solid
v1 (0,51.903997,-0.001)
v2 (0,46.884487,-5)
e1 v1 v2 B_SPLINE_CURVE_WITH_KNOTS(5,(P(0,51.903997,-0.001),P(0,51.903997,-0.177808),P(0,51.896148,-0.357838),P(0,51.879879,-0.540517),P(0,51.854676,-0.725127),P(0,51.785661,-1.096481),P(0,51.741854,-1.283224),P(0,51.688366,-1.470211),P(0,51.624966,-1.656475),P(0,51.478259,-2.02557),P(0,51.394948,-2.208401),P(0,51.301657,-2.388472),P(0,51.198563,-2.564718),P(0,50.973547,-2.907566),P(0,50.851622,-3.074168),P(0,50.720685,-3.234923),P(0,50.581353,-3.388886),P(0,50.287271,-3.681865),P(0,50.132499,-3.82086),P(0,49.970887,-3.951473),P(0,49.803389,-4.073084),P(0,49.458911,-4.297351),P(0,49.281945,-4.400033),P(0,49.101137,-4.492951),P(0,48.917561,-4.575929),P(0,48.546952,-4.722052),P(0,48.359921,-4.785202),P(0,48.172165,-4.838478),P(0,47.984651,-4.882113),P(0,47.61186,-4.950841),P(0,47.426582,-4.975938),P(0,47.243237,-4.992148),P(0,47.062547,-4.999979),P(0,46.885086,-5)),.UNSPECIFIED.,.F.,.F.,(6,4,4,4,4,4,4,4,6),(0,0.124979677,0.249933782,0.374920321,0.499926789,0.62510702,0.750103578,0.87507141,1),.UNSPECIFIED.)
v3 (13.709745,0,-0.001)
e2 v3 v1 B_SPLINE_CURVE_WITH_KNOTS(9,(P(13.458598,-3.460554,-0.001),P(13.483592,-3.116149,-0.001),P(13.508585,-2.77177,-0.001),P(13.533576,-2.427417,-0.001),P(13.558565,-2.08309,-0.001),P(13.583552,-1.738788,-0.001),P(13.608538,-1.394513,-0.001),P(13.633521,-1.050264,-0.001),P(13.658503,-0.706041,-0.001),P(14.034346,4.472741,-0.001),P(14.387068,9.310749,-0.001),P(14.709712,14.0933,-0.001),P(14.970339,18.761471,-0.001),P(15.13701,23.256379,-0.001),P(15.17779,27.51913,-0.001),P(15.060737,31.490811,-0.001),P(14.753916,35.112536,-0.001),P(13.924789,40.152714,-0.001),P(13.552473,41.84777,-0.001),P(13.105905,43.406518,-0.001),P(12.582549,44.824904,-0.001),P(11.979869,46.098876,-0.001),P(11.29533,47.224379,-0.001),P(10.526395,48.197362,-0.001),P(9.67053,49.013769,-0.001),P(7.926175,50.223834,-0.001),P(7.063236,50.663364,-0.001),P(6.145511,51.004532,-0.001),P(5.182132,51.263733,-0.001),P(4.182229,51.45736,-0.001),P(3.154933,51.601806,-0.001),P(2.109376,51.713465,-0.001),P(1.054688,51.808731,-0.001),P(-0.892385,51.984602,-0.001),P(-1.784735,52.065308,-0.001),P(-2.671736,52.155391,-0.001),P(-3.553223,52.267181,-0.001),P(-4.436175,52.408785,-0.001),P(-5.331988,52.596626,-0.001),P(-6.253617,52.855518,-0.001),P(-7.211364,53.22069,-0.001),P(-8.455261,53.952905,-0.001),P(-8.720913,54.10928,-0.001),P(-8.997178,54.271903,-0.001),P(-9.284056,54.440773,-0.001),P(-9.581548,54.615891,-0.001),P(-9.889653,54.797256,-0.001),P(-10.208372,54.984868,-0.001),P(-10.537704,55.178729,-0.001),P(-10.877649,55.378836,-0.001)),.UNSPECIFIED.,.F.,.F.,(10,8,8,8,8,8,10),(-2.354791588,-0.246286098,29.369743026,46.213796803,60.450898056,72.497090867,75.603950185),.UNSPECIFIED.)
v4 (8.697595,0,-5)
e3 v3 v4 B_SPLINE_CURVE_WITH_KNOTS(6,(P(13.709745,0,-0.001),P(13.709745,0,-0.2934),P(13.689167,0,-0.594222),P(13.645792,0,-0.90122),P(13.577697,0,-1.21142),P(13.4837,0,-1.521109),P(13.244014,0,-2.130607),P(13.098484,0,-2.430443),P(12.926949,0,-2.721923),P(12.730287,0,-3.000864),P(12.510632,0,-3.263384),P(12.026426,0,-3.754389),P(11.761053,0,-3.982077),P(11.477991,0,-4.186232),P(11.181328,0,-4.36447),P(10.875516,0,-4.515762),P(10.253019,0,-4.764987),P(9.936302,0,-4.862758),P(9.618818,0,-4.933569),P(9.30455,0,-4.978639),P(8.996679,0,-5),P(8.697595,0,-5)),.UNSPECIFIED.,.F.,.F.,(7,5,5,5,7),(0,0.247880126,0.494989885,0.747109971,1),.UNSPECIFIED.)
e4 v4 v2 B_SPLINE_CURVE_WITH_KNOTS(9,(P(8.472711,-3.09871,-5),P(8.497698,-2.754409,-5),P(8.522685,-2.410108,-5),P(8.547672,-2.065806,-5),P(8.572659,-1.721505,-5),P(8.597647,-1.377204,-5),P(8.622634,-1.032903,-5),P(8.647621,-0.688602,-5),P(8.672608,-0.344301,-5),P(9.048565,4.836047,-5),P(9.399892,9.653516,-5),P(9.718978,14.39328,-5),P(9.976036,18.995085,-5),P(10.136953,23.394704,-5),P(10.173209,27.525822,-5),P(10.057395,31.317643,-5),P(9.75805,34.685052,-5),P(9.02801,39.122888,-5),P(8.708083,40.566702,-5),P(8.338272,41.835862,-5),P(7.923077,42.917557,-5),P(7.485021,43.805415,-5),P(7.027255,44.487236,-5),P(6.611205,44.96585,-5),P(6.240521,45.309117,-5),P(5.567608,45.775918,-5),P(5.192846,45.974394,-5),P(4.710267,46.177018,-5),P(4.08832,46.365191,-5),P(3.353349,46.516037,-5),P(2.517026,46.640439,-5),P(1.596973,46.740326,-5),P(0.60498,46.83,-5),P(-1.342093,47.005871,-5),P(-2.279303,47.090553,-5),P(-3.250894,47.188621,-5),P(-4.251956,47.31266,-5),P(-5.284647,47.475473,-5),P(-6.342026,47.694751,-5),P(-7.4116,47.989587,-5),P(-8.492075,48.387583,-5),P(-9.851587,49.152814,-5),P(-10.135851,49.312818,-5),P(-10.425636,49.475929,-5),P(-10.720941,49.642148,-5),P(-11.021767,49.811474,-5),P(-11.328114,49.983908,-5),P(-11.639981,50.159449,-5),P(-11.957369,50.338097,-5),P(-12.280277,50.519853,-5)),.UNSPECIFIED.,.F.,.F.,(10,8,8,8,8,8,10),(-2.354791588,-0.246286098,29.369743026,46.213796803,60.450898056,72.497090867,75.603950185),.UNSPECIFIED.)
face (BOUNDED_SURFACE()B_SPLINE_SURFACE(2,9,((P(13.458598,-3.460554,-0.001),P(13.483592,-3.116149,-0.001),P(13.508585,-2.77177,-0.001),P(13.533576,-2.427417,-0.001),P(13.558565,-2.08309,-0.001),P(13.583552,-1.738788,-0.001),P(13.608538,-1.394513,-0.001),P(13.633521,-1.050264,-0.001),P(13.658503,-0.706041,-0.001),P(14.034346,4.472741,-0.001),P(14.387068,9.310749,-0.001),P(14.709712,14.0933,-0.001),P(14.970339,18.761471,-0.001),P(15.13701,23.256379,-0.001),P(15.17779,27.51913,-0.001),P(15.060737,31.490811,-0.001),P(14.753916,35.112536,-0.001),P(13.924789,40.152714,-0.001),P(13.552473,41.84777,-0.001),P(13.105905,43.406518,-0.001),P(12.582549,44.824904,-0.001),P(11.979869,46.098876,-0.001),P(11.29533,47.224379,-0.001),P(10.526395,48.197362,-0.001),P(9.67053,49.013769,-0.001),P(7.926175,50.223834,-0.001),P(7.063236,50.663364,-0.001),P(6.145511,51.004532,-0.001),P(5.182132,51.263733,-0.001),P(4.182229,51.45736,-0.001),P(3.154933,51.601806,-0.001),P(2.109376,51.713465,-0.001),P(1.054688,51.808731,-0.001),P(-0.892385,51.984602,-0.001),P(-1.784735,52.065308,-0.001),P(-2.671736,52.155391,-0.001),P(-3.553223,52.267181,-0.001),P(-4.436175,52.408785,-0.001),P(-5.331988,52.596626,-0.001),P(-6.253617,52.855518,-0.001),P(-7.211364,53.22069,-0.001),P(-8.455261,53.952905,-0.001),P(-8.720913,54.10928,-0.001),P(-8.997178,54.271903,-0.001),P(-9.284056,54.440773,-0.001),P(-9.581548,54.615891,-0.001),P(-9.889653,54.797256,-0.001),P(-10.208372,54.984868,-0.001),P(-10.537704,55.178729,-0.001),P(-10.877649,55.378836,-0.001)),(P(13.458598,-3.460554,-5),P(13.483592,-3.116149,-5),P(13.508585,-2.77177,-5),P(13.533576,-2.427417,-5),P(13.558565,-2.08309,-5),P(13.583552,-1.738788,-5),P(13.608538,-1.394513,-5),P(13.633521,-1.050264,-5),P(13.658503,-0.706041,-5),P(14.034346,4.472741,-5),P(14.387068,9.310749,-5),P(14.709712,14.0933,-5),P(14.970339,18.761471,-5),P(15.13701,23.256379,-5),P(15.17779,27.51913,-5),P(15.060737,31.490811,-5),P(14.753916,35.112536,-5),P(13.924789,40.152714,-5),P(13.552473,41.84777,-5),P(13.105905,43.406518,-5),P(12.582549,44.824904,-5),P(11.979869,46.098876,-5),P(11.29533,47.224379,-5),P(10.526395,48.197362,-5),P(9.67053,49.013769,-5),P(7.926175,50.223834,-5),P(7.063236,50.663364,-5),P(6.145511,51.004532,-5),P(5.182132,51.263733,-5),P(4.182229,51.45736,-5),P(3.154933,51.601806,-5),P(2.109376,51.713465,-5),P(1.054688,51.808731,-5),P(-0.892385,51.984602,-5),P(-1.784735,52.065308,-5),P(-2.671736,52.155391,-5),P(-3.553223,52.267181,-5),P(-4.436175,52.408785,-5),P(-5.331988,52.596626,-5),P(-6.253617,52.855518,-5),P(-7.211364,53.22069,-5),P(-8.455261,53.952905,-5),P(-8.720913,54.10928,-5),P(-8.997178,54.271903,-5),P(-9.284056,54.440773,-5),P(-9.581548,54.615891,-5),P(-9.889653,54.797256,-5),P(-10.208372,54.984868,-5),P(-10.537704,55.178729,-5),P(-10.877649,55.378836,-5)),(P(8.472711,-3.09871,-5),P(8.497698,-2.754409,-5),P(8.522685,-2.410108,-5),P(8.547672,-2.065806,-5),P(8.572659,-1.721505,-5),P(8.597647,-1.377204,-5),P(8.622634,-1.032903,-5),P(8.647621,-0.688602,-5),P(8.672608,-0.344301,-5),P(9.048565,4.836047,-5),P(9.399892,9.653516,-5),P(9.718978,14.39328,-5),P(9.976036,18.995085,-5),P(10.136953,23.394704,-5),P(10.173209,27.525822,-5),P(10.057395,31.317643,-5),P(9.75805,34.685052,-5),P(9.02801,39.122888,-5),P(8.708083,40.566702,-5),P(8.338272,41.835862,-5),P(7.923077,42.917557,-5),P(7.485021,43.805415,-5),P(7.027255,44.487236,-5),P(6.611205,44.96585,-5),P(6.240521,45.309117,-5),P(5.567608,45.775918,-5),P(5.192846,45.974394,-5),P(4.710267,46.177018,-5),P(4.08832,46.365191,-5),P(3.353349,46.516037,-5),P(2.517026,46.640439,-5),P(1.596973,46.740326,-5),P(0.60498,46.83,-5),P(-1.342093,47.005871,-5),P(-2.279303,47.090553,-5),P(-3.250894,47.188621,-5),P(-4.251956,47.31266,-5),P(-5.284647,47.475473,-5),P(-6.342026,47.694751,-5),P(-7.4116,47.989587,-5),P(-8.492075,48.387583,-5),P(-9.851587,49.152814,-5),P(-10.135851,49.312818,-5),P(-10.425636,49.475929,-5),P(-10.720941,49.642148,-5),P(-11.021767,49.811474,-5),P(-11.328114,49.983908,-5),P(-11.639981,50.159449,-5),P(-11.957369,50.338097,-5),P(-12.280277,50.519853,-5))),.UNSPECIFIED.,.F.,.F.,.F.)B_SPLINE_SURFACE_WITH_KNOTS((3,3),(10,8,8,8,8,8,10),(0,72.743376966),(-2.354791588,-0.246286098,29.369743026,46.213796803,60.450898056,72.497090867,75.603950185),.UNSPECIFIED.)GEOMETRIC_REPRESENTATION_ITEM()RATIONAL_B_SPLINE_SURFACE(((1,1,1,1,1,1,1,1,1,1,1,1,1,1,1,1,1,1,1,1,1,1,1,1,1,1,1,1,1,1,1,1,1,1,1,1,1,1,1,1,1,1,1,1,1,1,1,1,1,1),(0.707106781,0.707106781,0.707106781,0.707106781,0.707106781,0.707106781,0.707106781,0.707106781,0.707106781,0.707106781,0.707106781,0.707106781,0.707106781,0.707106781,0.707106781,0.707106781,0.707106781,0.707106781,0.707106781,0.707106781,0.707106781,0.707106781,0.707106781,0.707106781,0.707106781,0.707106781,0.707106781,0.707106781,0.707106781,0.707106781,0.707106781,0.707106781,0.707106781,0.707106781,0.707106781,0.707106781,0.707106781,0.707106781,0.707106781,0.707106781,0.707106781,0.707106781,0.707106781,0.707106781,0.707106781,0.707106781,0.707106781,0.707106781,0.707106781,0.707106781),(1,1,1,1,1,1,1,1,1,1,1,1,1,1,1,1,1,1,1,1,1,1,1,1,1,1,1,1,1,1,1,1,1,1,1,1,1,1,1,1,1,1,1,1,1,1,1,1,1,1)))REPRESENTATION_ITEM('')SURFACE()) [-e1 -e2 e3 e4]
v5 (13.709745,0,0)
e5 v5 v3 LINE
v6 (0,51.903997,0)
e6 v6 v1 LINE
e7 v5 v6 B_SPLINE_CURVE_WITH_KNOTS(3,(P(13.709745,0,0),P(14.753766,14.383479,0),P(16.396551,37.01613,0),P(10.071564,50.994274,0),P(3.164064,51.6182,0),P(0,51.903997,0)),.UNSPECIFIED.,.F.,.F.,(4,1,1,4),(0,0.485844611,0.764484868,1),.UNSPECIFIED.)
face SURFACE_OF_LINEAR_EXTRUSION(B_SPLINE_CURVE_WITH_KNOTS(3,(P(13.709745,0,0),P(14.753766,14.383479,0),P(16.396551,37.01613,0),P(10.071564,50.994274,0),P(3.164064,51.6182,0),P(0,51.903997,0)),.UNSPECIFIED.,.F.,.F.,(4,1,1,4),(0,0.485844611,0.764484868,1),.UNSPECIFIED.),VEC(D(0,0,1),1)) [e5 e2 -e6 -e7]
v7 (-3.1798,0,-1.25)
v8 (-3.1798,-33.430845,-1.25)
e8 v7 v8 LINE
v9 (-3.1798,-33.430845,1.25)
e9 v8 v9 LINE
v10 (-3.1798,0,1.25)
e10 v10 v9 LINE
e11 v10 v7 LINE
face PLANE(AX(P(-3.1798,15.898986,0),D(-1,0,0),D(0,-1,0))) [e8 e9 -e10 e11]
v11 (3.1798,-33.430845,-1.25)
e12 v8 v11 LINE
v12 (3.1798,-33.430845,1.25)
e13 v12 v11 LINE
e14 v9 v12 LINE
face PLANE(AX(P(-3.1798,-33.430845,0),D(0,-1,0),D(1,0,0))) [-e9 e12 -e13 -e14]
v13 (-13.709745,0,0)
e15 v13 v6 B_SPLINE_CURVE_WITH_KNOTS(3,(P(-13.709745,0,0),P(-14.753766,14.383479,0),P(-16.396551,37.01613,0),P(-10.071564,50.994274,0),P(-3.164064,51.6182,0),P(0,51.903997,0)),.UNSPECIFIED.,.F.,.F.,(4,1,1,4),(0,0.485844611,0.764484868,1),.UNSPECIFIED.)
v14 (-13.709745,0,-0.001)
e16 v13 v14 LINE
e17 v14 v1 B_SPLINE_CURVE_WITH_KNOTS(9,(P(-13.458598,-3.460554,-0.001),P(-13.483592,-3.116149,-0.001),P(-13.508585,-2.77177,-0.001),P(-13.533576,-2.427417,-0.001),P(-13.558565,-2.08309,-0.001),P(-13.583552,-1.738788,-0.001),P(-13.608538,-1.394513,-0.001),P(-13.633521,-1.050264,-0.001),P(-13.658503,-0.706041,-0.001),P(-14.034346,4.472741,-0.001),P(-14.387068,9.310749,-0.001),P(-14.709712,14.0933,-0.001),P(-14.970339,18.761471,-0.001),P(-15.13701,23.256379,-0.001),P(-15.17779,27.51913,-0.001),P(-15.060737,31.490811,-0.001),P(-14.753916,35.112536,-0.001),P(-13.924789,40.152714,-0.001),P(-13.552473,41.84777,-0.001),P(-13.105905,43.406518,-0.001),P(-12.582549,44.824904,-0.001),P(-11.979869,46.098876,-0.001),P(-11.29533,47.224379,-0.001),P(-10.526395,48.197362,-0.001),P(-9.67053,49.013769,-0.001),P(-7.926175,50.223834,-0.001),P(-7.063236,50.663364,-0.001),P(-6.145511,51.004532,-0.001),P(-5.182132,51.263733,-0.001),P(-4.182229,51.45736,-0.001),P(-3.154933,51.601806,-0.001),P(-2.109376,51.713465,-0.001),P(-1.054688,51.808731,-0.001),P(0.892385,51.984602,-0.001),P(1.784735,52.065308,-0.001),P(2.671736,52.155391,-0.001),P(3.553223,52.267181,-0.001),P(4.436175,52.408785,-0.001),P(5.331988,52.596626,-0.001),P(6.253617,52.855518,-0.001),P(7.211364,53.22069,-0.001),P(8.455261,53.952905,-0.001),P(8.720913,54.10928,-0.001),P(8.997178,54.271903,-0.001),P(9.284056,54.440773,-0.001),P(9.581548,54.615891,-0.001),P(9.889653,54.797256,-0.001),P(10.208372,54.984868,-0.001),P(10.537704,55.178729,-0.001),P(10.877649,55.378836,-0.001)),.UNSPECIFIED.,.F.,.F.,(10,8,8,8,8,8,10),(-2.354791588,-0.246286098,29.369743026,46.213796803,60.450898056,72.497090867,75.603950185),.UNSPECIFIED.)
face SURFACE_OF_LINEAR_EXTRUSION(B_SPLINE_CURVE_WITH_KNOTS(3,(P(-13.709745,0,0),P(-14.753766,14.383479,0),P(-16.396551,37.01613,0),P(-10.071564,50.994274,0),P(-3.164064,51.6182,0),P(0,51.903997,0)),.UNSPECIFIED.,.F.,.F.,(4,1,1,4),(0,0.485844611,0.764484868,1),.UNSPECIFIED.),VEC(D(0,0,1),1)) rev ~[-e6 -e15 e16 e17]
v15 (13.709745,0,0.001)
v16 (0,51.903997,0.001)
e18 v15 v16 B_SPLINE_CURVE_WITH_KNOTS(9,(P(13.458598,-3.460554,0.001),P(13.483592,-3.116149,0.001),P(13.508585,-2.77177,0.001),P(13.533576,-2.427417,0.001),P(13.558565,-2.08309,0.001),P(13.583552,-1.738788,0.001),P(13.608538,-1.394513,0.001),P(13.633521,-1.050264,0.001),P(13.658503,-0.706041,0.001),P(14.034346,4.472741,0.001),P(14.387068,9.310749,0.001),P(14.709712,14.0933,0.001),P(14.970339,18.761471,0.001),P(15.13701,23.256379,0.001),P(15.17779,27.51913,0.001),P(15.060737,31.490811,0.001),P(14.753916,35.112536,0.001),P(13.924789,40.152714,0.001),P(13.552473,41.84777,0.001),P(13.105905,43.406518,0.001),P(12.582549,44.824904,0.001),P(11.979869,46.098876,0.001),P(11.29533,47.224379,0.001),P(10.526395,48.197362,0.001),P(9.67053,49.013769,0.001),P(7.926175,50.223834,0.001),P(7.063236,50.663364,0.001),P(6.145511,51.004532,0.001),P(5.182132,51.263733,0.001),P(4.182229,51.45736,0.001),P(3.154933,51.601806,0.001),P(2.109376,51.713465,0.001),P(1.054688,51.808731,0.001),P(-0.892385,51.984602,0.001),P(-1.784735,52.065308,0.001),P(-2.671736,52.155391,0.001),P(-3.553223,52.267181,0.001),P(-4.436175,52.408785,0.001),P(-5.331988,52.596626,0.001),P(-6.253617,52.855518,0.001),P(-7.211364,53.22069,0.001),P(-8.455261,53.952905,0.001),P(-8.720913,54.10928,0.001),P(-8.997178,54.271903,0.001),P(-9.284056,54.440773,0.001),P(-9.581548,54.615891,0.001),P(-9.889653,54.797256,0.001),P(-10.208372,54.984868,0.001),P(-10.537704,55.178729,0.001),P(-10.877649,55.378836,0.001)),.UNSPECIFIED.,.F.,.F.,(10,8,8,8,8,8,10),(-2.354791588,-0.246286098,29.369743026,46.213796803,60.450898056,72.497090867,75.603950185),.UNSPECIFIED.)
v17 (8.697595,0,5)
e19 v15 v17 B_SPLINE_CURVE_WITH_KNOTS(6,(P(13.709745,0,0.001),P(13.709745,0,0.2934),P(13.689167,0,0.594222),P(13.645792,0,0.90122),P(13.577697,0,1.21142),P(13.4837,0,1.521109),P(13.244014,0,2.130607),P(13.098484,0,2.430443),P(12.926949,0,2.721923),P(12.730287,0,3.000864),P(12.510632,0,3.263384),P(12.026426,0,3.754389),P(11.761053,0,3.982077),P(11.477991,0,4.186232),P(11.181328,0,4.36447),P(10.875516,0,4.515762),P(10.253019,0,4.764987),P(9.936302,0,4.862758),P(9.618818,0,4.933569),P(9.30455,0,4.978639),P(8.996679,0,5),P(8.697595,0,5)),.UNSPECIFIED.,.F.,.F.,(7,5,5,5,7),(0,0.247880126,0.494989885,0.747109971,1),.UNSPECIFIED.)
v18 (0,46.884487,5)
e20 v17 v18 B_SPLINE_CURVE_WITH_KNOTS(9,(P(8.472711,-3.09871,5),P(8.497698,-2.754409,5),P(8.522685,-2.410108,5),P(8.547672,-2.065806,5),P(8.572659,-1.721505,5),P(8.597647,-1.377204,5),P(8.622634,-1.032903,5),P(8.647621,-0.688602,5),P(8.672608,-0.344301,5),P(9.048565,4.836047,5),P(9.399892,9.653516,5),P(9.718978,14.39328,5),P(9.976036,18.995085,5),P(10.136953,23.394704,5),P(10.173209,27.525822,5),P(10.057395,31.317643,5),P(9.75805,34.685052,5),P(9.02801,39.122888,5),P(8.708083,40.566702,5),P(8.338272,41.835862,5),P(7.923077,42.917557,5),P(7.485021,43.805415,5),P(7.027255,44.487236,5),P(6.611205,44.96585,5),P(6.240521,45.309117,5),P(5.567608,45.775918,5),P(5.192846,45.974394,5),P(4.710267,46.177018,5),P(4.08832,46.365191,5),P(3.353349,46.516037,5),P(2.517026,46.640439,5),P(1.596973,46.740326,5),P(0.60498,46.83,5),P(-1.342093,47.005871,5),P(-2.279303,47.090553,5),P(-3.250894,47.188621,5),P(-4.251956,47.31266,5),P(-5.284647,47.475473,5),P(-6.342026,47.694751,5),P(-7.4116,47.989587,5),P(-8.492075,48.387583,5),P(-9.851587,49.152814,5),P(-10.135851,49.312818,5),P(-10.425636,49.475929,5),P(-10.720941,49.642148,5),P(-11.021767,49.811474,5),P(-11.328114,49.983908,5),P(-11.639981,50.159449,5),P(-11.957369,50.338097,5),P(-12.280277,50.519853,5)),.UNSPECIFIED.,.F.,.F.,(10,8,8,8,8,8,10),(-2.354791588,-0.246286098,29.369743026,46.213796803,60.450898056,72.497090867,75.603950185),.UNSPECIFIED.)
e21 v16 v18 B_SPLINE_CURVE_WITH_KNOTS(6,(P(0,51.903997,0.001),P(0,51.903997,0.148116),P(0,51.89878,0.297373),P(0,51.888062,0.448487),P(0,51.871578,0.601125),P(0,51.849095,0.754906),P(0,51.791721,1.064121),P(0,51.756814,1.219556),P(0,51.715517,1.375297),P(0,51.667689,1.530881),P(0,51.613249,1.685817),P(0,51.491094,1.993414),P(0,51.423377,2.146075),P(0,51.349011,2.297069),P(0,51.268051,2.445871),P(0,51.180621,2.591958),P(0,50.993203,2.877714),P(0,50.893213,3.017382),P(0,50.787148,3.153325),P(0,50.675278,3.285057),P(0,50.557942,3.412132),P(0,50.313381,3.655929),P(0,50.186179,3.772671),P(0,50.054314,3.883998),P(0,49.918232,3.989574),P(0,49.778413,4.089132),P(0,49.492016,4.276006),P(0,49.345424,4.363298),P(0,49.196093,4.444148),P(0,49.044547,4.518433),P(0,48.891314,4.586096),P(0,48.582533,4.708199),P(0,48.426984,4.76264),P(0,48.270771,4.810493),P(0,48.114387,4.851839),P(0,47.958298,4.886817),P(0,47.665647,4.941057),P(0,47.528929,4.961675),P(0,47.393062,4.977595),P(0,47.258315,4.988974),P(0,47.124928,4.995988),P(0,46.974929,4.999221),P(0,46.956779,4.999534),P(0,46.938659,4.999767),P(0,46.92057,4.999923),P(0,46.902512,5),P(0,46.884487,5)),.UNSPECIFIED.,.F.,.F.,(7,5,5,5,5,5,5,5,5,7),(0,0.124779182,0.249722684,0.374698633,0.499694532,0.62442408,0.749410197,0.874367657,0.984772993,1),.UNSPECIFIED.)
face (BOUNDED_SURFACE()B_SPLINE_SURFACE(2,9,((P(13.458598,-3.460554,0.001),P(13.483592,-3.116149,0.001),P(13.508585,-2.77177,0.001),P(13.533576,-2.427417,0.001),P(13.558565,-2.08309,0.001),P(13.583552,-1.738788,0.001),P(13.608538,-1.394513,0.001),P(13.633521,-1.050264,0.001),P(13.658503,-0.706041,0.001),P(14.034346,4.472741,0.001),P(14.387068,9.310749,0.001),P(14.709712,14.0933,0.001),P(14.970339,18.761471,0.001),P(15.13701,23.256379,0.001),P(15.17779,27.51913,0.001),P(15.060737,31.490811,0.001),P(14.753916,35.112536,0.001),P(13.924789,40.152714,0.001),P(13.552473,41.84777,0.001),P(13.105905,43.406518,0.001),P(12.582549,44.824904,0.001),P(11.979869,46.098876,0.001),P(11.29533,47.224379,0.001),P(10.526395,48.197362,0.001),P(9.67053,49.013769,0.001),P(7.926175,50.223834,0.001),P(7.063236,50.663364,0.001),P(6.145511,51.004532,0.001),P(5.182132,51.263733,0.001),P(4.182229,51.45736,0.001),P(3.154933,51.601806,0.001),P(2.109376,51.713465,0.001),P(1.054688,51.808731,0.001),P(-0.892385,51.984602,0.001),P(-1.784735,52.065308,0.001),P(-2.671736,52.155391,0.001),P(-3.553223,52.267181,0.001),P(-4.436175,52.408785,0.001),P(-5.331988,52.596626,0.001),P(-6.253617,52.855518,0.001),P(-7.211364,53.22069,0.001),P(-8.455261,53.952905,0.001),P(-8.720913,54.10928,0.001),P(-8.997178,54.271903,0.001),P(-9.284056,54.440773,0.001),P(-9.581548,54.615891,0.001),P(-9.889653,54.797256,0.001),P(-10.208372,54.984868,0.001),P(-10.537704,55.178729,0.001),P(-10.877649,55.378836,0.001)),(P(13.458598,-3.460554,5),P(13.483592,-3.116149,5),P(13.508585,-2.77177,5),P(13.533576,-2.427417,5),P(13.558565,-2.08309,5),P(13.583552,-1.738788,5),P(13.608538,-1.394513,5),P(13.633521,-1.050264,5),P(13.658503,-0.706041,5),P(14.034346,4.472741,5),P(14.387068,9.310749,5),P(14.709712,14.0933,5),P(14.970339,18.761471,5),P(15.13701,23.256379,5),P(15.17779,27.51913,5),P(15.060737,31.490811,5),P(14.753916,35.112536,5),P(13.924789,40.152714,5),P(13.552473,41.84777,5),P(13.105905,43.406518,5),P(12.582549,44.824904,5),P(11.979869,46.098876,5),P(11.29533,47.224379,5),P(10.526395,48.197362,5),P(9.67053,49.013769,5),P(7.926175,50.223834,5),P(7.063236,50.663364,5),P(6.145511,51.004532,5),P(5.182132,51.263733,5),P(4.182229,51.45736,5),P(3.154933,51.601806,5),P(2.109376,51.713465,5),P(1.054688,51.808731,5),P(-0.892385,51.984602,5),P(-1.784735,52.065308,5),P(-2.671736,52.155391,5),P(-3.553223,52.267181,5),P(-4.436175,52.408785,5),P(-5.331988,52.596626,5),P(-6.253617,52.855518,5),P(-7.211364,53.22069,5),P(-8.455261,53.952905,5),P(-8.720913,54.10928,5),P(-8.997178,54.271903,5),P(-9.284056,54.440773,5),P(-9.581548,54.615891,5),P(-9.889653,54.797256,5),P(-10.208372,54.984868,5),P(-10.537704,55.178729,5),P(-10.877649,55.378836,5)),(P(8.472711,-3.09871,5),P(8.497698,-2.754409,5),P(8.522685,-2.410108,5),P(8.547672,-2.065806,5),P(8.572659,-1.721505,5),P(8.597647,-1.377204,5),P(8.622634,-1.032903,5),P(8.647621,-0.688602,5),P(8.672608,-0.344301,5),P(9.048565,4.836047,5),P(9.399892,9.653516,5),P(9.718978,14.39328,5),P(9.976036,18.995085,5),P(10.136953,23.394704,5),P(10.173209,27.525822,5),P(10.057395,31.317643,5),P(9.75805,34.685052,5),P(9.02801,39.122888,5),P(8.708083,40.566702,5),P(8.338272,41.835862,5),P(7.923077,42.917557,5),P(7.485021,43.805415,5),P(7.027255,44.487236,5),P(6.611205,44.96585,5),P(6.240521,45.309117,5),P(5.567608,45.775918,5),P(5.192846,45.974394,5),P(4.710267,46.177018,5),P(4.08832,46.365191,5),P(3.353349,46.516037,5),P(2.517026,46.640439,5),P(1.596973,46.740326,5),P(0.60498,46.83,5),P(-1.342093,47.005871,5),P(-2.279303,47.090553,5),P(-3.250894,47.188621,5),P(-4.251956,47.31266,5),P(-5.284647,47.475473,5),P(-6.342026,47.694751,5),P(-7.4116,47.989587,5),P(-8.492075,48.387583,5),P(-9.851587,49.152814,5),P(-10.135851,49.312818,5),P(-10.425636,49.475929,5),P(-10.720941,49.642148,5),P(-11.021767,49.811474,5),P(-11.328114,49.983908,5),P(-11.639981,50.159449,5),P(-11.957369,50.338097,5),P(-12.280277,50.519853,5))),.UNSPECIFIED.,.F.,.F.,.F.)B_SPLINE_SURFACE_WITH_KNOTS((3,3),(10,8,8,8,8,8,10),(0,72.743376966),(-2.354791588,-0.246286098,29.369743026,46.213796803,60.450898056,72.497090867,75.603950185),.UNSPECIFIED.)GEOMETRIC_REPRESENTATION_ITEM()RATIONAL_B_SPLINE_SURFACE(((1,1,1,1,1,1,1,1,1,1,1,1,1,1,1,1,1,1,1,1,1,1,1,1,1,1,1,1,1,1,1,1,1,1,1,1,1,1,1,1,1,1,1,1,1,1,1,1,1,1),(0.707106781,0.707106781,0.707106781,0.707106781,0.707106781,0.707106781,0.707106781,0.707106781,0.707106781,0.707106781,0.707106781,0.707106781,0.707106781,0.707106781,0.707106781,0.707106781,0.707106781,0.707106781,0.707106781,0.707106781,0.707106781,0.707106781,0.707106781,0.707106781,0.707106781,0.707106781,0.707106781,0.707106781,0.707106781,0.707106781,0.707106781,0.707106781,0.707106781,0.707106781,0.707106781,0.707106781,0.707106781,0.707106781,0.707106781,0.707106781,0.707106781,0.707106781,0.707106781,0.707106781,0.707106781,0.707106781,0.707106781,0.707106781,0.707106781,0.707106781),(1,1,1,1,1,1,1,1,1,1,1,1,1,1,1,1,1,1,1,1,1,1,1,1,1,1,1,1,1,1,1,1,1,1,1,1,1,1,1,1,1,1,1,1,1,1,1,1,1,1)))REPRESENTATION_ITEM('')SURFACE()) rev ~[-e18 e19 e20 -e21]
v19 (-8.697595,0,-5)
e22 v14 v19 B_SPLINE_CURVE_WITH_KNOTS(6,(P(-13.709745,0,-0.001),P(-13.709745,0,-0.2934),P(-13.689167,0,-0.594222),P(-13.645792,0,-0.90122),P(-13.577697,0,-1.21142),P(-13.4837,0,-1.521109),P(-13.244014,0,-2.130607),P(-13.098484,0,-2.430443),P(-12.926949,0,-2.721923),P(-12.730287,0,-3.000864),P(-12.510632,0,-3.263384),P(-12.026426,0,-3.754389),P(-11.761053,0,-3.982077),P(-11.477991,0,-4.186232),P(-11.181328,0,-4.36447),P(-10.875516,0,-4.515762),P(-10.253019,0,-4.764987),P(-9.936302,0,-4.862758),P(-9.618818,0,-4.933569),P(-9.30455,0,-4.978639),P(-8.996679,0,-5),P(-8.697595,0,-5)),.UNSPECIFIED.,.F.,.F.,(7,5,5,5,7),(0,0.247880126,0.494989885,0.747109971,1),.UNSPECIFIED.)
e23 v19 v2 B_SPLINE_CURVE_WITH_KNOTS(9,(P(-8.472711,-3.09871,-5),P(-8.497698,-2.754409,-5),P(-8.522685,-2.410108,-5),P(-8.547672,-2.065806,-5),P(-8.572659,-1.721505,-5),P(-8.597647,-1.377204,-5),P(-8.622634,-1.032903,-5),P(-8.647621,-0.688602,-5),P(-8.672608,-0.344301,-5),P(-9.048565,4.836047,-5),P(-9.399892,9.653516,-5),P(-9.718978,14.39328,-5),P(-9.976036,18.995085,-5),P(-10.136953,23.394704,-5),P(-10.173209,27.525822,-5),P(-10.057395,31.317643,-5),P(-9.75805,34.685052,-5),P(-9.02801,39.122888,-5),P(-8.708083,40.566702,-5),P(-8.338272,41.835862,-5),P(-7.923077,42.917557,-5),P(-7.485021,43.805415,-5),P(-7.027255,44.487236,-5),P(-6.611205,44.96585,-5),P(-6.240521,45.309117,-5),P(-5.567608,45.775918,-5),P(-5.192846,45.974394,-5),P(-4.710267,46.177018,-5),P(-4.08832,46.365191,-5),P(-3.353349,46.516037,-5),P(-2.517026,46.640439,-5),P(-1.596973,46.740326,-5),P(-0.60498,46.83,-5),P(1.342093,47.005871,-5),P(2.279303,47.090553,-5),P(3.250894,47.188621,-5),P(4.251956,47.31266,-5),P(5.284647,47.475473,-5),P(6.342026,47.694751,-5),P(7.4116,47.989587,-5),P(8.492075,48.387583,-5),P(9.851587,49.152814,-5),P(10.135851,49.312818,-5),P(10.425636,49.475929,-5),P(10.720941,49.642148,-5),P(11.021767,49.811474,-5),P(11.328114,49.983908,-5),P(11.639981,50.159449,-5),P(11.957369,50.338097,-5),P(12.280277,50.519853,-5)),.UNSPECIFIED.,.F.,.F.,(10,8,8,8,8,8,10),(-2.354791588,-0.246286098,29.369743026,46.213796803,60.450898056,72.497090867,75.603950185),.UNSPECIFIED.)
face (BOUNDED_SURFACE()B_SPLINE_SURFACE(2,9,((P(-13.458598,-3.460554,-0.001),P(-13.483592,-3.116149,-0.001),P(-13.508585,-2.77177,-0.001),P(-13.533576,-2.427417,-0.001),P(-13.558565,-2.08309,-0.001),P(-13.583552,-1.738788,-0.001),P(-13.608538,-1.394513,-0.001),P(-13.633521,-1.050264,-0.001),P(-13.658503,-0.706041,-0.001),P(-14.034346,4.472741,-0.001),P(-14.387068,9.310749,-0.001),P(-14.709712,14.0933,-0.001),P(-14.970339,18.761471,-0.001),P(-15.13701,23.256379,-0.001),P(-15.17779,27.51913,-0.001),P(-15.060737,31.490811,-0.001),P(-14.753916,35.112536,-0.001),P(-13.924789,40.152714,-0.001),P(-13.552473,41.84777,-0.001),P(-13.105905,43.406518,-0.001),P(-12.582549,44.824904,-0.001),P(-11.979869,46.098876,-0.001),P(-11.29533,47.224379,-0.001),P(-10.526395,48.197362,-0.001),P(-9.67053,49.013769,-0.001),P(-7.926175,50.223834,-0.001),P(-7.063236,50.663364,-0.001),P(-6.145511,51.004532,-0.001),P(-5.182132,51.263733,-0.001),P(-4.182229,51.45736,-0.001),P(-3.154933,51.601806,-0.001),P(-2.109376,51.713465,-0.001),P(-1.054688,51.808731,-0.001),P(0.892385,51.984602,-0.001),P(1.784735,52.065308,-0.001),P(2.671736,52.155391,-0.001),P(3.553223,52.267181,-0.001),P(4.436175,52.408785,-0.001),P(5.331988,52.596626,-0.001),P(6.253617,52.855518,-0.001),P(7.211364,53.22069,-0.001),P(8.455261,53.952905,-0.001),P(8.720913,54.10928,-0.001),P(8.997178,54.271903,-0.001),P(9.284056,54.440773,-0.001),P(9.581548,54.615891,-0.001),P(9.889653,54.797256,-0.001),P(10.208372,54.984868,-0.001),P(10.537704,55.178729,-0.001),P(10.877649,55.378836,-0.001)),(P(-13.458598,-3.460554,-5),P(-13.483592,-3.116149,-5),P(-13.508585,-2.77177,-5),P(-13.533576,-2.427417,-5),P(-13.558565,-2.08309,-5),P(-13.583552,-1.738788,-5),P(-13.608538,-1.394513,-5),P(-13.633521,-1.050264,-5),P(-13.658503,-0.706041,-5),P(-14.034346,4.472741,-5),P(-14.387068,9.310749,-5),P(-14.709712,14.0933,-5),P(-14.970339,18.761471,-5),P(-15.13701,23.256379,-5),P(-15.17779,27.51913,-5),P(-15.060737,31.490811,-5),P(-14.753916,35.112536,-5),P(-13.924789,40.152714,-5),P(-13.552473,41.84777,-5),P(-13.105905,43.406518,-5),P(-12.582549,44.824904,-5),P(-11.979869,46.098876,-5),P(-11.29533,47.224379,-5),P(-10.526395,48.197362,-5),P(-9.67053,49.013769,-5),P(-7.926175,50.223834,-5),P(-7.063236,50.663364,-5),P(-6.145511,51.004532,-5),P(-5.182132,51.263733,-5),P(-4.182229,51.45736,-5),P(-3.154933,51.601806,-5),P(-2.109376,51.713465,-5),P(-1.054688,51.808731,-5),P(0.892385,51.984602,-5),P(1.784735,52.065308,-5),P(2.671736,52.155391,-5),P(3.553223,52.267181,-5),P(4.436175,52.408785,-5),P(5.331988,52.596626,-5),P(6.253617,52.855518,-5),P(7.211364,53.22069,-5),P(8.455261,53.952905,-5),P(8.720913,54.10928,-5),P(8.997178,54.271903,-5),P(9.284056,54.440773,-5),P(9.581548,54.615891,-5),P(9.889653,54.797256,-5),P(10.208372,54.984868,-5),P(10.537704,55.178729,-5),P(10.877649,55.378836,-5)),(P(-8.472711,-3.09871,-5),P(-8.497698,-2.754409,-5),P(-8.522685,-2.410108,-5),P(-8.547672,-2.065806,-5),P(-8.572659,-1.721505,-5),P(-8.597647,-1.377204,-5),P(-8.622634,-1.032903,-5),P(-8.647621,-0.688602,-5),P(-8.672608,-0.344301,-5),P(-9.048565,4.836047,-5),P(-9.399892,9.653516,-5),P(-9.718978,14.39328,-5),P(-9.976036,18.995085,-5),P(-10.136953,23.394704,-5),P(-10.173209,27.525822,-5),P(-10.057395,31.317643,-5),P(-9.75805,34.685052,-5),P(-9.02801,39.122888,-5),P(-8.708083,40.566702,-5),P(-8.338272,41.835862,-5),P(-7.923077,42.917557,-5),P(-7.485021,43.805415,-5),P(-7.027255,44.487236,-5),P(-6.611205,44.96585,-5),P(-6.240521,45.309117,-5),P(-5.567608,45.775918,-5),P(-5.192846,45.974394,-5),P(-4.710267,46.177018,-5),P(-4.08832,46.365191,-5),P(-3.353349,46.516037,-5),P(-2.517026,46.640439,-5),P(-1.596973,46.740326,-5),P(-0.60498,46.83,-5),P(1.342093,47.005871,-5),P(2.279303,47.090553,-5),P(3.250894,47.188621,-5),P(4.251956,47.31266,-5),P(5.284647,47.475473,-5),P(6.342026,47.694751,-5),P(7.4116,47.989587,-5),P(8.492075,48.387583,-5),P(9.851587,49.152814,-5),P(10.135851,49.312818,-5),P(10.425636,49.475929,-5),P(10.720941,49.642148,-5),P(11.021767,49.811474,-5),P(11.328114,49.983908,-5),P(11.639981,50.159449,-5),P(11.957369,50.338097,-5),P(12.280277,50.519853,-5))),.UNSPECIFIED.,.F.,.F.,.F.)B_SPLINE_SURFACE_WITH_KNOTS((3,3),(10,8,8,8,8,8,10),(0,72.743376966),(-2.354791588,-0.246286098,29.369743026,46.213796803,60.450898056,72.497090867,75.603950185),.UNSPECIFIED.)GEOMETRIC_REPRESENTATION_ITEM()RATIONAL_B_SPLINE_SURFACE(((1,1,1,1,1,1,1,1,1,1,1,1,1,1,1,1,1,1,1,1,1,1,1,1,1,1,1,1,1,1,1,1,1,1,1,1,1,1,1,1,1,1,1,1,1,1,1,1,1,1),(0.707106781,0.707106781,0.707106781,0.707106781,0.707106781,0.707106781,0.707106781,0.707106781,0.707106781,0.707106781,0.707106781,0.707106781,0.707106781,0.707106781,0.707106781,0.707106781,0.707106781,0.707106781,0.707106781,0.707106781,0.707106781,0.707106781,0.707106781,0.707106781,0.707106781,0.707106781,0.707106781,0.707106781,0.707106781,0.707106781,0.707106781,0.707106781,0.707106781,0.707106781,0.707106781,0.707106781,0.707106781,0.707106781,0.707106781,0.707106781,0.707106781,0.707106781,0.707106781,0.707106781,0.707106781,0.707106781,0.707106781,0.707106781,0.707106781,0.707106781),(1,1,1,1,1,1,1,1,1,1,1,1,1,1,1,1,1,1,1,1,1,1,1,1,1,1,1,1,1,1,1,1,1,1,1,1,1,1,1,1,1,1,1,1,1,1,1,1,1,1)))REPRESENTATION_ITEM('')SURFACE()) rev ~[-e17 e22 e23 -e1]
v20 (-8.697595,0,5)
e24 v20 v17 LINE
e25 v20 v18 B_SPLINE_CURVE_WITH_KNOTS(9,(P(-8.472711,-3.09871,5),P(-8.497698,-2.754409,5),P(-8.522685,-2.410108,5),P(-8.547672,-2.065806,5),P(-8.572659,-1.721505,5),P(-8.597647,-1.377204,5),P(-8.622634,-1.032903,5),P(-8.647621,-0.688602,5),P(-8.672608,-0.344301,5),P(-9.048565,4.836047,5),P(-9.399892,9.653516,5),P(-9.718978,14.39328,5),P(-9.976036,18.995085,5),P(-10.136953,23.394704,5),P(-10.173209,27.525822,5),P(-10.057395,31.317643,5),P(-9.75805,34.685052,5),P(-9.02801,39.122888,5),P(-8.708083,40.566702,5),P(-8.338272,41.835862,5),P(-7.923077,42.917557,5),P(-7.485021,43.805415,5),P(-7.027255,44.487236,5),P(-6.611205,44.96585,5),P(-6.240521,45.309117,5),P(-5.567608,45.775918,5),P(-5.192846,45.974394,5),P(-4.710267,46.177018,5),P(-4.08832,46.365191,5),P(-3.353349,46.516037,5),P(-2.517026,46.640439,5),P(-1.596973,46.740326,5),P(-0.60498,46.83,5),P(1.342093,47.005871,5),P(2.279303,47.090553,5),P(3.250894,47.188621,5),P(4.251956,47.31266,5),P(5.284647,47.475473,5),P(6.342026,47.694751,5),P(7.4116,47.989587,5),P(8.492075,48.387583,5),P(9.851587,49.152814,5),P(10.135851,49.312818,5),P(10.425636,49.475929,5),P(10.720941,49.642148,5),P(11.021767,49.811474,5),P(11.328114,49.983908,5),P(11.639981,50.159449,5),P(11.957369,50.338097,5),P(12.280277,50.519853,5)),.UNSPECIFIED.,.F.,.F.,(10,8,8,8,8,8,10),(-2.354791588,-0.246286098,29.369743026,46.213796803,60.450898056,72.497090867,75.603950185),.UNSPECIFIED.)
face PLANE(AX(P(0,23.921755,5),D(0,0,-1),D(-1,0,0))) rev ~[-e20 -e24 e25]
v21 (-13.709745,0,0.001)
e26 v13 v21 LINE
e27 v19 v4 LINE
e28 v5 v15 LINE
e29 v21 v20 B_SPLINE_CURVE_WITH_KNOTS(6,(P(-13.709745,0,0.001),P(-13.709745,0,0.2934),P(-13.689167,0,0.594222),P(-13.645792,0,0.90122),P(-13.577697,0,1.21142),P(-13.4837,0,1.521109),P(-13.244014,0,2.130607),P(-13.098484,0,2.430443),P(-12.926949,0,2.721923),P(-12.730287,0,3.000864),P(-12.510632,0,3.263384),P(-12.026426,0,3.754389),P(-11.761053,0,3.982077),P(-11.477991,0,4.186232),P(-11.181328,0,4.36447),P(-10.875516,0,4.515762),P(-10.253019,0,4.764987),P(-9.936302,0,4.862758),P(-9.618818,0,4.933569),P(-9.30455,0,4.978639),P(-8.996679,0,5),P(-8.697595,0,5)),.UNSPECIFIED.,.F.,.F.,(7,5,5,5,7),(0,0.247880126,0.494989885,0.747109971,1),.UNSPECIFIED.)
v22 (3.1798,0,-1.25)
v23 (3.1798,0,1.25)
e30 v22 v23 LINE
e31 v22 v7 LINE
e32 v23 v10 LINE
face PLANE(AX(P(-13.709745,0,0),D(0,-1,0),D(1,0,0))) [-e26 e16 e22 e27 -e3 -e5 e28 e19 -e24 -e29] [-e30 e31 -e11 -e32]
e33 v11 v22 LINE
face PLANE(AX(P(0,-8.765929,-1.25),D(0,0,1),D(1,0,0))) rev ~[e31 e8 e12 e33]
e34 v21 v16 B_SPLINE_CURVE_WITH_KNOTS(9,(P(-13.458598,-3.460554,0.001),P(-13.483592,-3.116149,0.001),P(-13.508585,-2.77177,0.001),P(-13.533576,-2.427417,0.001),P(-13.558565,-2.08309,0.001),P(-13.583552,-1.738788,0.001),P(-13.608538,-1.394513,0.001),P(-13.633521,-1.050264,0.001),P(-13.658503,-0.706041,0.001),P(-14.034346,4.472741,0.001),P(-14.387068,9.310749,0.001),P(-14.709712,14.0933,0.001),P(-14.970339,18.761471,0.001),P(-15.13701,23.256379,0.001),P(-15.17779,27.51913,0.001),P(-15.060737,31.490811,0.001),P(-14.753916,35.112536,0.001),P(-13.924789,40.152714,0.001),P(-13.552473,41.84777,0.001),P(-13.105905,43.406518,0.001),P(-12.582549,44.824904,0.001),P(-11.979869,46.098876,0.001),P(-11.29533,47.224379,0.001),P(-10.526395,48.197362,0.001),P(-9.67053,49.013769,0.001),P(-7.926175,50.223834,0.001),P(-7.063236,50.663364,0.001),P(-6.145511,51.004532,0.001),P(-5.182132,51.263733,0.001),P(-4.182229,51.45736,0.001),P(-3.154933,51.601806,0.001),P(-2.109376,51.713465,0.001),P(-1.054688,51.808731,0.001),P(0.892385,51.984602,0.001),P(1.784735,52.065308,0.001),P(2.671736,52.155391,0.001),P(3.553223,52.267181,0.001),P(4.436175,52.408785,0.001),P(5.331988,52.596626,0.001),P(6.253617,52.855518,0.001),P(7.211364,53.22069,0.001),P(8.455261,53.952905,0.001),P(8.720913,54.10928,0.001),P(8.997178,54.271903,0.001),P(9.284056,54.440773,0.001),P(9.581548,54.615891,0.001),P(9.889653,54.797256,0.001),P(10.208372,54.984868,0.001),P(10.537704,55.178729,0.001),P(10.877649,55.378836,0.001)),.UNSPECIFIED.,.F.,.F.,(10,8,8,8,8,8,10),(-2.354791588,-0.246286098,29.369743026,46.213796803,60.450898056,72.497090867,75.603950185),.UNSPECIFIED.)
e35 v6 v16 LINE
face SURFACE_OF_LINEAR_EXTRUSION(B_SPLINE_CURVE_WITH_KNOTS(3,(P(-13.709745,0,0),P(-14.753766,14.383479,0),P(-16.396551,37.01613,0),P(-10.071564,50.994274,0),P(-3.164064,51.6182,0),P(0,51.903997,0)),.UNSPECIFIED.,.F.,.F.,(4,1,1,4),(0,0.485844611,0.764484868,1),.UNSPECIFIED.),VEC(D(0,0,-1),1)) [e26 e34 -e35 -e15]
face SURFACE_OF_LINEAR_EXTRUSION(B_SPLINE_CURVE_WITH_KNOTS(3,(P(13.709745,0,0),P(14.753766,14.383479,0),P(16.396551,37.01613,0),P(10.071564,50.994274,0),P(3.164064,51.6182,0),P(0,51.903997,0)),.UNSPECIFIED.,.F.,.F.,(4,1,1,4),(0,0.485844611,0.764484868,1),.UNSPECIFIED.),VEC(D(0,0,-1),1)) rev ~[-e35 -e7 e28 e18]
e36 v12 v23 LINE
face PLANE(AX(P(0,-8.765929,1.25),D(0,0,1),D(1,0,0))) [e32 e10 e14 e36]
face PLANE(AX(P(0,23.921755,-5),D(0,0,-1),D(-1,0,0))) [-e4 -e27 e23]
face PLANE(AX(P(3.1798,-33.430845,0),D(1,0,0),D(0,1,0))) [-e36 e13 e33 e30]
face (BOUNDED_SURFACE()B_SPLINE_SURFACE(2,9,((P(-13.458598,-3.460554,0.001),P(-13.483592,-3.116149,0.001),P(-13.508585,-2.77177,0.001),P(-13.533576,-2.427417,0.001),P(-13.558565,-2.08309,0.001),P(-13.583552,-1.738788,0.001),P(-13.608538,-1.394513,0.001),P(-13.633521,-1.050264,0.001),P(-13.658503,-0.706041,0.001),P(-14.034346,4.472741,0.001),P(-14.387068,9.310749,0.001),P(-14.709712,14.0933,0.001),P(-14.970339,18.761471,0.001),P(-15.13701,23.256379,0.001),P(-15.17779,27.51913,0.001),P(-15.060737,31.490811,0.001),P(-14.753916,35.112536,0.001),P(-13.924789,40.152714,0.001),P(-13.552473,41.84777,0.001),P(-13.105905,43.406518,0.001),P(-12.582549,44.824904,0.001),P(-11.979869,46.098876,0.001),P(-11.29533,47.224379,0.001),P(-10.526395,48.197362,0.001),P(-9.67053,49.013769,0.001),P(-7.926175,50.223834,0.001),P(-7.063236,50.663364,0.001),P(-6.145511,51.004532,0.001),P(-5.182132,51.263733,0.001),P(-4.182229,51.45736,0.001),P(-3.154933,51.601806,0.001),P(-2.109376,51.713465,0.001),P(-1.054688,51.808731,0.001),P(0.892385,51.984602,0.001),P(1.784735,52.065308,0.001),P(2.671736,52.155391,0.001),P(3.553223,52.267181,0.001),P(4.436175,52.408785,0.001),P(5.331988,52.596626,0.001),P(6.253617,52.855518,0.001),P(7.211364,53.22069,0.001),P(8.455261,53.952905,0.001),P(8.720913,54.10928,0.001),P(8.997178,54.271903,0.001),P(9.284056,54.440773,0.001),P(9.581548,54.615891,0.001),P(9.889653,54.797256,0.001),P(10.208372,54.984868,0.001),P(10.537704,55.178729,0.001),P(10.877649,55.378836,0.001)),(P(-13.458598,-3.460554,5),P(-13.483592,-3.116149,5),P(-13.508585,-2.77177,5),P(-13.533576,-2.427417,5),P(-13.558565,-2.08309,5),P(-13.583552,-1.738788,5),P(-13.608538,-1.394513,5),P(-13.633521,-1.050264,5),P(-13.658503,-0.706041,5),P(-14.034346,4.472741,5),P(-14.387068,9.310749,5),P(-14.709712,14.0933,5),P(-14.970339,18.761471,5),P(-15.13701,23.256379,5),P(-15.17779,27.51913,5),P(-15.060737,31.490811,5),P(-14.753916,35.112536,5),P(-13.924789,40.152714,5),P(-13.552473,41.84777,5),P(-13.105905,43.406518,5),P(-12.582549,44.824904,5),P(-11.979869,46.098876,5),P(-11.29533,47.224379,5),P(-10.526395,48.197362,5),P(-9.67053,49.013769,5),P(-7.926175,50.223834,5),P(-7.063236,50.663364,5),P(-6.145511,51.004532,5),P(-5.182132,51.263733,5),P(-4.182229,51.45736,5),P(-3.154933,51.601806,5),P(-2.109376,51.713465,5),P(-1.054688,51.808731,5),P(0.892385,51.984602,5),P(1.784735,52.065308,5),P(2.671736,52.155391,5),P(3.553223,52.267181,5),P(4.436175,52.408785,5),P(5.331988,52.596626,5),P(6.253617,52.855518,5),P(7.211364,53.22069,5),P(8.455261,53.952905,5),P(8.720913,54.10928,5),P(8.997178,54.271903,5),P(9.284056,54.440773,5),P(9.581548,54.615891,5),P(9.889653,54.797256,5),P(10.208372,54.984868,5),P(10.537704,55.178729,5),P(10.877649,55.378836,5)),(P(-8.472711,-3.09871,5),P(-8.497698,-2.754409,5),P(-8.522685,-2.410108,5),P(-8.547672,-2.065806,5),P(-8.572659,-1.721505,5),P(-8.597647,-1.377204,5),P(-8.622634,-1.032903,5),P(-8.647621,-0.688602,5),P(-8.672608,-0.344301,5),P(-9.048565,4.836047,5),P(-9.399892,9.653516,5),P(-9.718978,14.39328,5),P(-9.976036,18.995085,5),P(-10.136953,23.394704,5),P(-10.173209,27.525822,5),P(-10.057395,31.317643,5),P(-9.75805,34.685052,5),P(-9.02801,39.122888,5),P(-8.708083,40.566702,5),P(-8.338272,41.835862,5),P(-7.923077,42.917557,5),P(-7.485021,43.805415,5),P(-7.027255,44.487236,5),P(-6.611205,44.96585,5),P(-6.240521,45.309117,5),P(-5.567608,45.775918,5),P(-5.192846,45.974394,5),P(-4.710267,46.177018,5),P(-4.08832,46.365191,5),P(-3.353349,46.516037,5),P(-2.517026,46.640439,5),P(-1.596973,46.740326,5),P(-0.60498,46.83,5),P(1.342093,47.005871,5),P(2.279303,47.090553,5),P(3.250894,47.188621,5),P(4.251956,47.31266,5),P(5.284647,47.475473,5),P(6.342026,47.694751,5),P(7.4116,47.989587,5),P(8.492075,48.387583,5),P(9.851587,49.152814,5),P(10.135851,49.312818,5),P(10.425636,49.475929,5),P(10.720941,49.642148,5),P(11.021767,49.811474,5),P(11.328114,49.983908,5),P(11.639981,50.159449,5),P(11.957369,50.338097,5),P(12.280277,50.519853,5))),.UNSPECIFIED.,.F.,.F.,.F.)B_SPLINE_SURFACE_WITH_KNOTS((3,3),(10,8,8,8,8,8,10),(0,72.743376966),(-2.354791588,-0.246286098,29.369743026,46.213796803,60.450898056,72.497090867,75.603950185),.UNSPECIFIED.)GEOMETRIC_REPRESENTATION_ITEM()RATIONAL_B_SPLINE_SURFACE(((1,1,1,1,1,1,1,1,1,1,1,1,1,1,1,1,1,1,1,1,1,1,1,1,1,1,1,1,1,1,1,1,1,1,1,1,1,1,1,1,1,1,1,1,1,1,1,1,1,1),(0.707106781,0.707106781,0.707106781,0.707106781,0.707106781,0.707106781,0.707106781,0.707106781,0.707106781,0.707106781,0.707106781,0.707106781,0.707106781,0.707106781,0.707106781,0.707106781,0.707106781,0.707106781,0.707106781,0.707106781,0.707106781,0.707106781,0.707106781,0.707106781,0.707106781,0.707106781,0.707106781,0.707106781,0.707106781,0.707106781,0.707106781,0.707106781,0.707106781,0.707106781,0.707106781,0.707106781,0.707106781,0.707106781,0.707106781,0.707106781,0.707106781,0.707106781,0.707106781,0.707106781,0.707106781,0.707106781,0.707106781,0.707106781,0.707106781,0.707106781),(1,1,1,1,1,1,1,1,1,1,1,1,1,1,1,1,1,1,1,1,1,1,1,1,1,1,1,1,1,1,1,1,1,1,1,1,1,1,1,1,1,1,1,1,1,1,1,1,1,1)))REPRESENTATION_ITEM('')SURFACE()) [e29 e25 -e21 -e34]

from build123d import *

# Parameters (mm, degrees)
F1_DEPTH = 5
F2_R     = 4.999
F4_DEPTH = 1.25


# Not quite as in the source:
# - a fillet or chamfer is up to 0.001 mm smaller than in the source, because OpenCascade refuses the exact size


with BuildPart() as f1:
    # F0 (on Top) → F1 (new body, symmetric)
    with BuildSketch(Plane.XY):
        with BuildLine():
            add(Edge.make_bspline(
                [(-13.7097453699, 0), (-14.7537661126, 14.3834786699), (-16.3965507437, 37.0161302377), (-10.0715641044, 50.9942741703), (-3.1640643241, 51.6181998618), (0, 51.9039966166)],
                knots=[0, 0, 0, 0, 0.4858446106, 0.7644848677, 1, 1, 1, 1], degree=3))
            Line((-13.7097453699, 0), (13.7097453699, 0))
            add(Edge.make_bspline(
                [(13.7097453699, 0), (14.7537661126, 14.3834786699), (16.3965507437, 37.0161302377), (10.0715641044, 50.9942741703), (3.1640643241, 51.6181998618), (0, 51.9039966166)],
                knots=[0, 0, 0, 0, 0.4858446106, 0.7644848677, 1, 1, 1, 1], degree=3))
        make_face()
    extrude(amount=F1_DEPTH, both=True)

    # F2 (radius 5 in the source; OpenCascade refuses exactly that, so slightly less here)
    f2_edges = [f1.edges().sort_by_distance(p)[0] for p in [
        (-14.960078, 30.185645, 5),
        (14.960078, 30.185645, 5),
        (-14.960078, 30.185645, -5),
        (14.960078, 30.185645, -5),
    ]]
    fillet(f2_edges, radius=F2_R)

    # F3 (on Top) → F4 (join, symmetric)
    with BuildSketch(Plane.XY):
        Polygon((3.1797995325, 15.8989857882), (0, 15.8989857882), (-3.1797995325, 15.8989857882), (-3.1797995325, -33.4308445454), (0, -33.4308445454), (3.1797995325, -33.4308445454), align=None)
    extrude(amount=F4_DEPTH, both=True)


solid = f1.part
